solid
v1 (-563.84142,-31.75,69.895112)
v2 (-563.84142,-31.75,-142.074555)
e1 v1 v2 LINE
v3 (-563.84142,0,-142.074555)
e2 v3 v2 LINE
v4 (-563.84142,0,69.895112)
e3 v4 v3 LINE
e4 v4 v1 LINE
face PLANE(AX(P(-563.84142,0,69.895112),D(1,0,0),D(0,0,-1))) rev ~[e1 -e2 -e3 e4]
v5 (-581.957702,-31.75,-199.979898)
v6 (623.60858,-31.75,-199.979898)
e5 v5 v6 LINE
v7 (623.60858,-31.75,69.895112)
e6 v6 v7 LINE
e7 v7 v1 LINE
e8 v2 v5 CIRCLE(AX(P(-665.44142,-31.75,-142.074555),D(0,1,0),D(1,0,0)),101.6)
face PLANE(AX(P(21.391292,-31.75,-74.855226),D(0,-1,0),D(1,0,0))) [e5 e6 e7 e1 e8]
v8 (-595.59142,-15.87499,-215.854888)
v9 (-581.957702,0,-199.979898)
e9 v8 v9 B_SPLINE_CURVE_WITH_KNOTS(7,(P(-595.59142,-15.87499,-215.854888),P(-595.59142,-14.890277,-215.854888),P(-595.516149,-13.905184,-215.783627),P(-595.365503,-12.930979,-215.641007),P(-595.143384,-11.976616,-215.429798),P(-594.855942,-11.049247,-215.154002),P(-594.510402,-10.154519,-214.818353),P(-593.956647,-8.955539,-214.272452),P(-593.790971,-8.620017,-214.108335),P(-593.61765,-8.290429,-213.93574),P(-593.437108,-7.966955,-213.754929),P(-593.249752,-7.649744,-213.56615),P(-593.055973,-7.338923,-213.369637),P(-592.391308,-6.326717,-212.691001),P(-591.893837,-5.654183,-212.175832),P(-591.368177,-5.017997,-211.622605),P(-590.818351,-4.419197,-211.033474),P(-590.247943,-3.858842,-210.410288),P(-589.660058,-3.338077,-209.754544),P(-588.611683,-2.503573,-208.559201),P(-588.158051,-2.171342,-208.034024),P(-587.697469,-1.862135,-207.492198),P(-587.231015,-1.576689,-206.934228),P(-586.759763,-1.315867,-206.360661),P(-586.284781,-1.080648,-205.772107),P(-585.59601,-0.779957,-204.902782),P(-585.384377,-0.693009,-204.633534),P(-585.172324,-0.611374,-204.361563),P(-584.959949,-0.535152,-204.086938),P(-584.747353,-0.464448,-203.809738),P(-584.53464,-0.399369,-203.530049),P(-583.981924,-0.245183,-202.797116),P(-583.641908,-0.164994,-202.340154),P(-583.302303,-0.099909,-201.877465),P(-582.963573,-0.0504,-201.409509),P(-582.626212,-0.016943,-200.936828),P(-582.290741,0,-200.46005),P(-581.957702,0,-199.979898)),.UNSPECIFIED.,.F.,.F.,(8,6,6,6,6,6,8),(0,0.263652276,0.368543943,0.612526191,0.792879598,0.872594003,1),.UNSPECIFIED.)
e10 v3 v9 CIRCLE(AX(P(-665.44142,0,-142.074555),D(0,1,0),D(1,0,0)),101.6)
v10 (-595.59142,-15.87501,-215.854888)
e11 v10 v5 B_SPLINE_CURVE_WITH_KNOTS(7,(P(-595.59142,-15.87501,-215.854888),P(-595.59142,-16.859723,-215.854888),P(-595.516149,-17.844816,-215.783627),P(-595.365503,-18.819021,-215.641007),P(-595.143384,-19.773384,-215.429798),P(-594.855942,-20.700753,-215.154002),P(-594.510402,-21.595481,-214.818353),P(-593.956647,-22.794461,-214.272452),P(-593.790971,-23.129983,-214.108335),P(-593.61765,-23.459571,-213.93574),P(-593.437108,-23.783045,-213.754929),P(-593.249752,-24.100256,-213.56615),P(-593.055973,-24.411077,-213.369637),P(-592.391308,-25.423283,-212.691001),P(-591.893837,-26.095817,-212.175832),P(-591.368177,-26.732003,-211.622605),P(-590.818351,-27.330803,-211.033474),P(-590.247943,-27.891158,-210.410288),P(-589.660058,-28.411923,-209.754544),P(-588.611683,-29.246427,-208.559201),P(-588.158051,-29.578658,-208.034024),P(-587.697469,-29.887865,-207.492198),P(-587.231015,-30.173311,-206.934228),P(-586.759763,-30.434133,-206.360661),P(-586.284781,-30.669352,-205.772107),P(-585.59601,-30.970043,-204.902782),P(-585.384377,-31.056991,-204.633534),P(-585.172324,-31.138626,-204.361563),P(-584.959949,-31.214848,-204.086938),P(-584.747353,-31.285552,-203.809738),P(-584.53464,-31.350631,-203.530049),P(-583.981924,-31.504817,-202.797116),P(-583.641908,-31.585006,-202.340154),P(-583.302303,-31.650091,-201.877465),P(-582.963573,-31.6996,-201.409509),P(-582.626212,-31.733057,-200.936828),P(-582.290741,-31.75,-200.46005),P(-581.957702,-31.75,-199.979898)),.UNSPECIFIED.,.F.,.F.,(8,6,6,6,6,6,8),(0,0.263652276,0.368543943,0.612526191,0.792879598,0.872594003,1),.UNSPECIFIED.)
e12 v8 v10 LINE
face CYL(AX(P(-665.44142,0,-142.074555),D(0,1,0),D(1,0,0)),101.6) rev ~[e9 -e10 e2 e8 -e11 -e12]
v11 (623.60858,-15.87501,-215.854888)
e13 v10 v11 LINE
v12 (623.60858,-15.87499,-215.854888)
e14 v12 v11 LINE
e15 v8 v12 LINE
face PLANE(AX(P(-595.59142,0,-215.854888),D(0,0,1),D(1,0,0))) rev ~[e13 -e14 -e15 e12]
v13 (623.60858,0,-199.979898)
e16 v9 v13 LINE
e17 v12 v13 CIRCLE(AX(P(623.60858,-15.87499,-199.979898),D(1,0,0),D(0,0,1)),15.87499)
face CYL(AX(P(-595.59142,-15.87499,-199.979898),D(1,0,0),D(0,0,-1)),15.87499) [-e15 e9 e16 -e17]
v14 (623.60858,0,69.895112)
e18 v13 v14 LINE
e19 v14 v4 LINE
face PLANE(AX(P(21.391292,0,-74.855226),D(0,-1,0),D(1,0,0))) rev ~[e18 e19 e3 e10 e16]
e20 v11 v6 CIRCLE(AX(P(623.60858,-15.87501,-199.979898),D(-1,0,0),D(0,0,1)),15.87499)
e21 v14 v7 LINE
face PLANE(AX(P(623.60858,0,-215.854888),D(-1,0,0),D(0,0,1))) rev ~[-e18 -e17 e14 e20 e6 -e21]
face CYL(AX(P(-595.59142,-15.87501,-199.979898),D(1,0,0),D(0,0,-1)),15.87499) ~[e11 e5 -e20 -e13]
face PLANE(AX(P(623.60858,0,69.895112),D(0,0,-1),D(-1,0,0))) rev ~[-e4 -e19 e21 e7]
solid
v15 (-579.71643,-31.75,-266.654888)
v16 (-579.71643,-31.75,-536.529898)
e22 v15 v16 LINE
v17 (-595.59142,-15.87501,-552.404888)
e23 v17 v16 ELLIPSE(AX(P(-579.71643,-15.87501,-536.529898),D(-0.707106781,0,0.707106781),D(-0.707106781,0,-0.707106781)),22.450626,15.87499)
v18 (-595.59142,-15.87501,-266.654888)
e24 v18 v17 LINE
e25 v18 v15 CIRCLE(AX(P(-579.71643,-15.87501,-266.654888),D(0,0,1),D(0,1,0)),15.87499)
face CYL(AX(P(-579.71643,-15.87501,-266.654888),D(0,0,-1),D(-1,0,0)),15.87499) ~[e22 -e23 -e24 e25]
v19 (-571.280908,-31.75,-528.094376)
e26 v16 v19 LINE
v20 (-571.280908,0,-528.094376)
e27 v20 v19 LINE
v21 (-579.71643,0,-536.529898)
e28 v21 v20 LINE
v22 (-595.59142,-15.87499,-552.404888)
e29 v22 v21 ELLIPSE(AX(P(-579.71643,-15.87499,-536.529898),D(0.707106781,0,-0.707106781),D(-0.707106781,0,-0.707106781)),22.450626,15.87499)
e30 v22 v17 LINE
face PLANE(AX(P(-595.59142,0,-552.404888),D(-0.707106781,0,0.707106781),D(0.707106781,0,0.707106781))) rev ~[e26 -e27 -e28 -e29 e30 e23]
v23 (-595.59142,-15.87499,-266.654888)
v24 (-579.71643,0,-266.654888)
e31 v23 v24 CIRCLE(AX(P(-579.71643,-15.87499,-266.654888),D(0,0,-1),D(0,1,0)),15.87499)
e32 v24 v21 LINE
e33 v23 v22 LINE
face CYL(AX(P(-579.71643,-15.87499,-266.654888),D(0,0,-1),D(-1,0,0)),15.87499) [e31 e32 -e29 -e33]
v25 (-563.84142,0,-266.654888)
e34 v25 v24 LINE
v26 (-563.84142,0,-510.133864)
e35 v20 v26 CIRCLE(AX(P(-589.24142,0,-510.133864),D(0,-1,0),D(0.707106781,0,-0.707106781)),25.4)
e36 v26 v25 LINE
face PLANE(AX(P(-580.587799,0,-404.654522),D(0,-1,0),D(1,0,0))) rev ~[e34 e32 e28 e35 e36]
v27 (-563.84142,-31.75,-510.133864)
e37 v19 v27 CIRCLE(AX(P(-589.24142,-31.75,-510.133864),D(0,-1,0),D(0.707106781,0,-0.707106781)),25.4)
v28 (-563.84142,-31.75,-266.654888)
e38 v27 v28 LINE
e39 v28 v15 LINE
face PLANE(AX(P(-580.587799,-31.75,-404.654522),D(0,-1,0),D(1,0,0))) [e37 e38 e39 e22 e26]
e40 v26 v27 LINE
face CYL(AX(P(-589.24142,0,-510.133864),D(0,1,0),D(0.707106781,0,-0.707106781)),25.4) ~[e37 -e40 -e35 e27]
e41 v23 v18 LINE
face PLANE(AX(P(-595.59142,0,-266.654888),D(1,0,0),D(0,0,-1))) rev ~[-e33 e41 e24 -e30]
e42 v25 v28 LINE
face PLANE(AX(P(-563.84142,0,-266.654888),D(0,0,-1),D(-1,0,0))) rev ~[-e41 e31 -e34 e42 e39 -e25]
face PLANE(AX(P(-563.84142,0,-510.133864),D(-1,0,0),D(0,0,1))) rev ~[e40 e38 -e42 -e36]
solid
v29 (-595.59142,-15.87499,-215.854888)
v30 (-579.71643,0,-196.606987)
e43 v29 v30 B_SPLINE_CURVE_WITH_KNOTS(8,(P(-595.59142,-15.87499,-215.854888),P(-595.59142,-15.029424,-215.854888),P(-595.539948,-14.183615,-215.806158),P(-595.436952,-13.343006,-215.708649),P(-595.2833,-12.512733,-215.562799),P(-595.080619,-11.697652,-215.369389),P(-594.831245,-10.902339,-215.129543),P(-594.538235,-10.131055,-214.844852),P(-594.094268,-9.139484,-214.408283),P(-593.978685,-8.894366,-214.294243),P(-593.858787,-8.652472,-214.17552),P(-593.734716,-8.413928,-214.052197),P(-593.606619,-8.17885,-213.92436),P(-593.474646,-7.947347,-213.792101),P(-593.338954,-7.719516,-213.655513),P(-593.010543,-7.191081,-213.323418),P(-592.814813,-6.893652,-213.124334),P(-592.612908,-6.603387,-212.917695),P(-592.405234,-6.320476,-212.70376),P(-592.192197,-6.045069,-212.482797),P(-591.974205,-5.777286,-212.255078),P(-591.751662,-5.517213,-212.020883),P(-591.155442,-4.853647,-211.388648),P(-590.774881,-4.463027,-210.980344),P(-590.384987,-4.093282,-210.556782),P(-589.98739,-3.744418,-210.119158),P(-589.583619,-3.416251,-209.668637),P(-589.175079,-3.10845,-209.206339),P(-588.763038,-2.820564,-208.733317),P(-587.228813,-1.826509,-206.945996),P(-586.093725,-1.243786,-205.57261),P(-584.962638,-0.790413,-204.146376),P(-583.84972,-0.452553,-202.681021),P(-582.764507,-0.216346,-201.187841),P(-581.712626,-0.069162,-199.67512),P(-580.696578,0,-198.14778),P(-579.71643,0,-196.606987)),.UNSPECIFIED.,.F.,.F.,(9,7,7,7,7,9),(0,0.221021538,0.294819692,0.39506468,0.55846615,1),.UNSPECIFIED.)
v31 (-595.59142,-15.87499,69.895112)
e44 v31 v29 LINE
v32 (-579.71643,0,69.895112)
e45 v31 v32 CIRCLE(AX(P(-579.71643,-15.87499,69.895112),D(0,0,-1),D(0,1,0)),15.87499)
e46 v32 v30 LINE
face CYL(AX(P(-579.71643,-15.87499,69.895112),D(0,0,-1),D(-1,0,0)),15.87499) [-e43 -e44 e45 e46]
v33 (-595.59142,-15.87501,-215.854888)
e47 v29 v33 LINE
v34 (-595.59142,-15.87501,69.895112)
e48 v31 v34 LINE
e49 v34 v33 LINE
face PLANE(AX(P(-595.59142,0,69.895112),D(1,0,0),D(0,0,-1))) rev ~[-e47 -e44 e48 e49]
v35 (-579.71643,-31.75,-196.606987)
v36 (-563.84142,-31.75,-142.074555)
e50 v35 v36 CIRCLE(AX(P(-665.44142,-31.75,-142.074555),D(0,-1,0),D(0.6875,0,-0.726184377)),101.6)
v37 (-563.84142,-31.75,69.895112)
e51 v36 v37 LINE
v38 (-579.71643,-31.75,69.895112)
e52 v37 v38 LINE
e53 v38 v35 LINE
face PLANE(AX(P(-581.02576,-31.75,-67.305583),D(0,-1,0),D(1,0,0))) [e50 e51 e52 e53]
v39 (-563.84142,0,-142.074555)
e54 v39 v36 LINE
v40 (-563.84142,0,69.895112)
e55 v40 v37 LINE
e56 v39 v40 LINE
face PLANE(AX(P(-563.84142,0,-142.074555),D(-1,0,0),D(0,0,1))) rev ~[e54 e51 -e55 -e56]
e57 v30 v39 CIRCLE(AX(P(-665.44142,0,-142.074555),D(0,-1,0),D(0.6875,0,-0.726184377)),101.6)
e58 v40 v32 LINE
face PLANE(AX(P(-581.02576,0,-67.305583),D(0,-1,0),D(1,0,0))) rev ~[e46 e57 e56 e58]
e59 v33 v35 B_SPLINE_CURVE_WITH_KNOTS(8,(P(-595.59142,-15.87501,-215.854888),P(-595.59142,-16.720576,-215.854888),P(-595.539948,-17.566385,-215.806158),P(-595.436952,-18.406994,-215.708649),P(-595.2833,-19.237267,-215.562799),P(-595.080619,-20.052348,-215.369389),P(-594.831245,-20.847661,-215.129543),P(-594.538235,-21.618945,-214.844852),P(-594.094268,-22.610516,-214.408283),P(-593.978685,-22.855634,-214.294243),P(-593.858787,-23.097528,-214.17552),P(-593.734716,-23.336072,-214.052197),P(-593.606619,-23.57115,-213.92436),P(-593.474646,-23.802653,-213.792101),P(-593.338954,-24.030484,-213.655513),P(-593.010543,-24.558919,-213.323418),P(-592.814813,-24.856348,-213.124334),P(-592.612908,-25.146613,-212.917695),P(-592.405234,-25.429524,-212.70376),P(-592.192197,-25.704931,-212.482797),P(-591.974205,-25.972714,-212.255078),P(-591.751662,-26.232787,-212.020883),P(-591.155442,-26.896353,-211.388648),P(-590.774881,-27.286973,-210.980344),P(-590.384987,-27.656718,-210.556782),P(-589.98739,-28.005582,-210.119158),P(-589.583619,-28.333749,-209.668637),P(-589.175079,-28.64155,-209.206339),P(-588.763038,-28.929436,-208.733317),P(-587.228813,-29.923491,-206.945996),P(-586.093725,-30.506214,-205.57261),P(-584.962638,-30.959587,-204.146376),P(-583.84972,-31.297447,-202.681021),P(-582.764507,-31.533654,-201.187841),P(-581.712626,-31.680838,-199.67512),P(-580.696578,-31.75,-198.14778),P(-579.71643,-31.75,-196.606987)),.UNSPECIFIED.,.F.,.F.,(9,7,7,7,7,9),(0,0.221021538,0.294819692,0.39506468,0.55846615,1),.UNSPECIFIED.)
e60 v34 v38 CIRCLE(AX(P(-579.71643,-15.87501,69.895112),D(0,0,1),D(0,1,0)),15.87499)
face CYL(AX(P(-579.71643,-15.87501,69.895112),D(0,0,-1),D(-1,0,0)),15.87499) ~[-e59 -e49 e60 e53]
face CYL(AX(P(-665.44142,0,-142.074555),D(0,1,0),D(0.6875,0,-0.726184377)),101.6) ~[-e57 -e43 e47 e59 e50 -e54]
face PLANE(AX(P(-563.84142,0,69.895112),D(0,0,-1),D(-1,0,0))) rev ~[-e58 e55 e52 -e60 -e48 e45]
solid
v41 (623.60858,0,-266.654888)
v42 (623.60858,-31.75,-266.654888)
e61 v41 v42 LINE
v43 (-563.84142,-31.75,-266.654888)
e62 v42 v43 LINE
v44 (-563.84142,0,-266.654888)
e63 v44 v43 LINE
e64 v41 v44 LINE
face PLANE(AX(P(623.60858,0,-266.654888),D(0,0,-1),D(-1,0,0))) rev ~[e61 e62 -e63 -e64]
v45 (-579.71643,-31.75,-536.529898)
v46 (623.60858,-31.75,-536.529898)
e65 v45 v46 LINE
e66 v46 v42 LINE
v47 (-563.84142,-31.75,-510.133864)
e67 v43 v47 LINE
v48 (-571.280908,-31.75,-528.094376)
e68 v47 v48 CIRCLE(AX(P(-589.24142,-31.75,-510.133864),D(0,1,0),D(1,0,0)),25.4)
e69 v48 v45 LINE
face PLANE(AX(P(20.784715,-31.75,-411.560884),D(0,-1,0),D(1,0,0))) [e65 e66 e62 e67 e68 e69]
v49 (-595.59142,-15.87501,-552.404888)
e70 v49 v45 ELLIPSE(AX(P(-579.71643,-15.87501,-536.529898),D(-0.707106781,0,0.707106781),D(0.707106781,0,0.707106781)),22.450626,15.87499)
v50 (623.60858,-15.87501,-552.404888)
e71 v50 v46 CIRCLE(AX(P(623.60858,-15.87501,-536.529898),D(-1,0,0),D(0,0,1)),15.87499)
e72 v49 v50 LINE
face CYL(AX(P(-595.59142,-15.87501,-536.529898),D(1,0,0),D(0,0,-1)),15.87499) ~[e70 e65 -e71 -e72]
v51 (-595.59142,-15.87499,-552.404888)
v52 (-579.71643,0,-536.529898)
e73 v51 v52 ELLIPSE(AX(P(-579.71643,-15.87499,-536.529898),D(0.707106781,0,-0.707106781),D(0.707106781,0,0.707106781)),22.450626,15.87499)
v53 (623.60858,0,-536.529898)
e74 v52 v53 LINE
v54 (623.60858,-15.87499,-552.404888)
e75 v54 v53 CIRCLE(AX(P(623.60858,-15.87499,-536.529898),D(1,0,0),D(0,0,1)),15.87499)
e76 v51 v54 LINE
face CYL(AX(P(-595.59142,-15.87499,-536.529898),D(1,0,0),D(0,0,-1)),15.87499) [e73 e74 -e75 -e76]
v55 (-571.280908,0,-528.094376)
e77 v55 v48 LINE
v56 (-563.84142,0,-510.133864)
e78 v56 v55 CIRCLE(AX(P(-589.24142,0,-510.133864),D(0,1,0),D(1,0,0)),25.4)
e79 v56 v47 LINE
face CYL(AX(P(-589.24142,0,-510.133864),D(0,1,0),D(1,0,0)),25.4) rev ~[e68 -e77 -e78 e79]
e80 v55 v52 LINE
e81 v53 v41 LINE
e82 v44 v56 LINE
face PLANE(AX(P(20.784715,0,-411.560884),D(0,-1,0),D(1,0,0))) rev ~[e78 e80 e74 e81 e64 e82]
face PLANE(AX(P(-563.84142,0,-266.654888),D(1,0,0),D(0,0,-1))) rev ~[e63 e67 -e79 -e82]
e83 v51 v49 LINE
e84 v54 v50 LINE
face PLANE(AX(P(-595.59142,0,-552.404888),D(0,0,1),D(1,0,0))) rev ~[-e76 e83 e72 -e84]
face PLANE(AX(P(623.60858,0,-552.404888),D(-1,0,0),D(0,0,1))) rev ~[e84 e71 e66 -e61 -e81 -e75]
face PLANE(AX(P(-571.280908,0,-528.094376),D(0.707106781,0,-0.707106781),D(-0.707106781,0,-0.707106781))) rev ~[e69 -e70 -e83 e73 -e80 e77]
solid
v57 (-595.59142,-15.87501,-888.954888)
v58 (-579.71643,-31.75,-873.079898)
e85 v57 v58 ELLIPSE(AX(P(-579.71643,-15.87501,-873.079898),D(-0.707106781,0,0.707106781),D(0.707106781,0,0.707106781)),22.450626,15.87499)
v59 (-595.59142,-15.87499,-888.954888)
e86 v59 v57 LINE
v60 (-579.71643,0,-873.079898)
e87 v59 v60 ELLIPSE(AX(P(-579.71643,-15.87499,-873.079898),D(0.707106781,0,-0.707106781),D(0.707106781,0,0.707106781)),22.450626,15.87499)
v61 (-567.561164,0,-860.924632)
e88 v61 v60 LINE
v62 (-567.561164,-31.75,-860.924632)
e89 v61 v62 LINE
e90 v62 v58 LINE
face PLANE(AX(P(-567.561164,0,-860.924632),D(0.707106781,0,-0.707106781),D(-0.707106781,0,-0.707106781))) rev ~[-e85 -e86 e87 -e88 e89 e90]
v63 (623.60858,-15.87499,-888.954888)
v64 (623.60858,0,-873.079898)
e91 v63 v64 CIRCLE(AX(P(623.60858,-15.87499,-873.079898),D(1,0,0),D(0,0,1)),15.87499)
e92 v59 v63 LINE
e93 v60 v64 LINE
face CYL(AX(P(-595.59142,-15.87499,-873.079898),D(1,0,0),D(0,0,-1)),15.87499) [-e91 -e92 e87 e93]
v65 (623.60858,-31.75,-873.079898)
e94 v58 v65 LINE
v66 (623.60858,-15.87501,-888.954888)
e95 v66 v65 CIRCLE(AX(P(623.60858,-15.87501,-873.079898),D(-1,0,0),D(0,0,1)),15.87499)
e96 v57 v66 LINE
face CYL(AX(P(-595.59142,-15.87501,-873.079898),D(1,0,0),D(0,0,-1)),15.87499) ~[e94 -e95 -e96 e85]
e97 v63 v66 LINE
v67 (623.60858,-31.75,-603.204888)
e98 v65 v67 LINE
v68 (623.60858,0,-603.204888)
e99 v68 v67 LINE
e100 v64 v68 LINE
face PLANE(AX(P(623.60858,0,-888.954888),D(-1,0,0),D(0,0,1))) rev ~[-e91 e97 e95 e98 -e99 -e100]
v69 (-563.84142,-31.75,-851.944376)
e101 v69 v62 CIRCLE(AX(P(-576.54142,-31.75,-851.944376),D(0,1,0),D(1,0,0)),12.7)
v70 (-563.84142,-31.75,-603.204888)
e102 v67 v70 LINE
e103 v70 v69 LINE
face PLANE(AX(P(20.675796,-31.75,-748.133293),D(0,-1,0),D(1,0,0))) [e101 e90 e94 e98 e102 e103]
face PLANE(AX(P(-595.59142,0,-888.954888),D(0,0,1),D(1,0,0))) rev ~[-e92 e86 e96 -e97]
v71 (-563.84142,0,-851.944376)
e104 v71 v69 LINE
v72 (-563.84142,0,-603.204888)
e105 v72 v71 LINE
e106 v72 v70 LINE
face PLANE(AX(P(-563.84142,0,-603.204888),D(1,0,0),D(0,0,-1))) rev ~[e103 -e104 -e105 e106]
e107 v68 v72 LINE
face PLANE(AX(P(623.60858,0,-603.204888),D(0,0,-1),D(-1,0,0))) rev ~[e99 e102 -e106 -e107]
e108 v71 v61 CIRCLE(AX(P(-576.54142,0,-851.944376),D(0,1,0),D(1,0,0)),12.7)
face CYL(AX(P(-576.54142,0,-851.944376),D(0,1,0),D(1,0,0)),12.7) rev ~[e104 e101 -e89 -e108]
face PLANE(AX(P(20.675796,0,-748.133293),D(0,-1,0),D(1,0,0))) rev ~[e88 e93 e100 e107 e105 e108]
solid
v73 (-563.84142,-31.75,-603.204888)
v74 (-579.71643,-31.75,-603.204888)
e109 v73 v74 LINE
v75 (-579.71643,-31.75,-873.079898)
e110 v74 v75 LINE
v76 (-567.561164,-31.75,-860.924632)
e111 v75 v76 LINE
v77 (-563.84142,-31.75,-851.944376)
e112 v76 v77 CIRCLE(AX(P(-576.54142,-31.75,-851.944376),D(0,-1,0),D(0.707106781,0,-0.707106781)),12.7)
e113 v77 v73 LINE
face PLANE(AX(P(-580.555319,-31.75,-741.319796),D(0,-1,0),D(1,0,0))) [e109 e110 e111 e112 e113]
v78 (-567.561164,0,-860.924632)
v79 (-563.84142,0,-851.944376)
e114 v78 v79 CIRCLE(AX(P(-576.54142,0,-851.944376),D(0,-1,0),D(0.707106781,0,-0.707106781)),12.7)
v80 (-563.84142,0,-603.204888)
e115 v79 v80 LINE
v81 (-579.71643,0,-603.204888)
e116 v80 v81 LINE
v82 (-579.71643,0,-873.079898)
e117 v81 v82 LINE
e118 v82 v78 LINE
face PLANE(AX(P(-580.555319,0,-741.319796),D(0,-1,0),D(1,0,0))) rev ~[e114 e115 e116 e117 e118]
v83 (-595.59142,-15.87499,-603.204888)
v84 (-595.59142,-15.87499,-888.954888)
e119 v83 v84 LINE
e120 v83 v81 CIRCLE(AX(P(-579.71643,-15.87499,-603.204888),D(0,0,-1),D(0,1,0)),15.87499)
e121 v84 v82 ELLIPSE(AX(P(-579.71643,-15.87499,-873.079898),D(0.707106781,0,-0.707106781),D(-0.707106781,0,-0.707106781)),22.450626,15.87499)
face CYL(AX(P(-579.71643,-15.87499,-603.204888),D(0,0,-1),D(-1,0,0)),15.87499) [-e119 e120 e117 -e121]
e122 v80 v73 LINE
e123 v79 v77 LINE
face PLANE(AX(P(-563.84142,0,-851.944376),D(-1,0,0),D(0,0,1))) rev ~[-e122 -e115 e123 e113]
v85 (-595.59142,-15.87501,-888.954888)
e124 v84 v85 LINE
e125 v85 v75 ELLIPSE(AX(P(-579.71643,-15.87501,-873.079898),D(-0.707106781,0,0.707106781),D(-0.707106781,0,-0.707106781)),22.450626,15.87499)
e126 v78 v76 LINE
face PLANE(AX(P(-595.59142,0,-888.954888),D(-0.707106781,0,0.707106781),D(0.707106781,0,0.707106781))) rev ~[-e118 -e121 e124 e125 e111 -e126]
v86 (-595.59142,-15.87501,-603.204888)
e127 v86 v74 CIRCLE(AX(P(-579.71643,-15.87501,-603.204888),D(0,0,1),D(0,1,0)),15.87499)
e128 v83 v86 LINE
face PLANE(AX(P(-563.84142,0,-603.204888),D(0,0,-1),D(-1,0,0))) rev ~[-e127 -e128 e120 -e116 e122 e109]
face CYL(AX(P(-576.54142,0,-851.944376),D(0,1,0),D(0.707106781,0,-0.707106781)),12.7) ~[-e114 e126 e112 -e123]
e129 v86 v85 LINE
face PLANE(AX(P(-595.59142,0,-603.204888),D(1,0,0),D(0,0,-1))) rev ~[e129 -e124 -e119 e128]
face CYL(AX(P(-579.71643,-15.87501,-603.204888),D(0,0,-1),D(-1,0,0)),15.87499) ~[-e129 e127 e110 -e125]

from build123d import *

# Parameters (mm, degrees)
F1_DEPTH = 31.75
F2_DEPTH = 31.75
F3_R     = 15.87499
F3_2_R   = 15.87499
F3_3_R   = 15.87499
F3_4_R   = 15.87499
F3_5_R   = 15.87499
F3_6_R   = 15.87499


# Not quite as in the source:
# - a fillet or chamfer is up to 0.001 mm smaller than in the source, because OpenCascade refuses the exact size


with BuildPart() as f1:
    # F0 (on Front) → F1 (new body)
    with BuildSketch(Plane.XZ):
        with BuildLine():
            Line((623.6085797757, 69.8951120117), (-563.8414202243, 69.8951120117))
            Line((-563.8414202243, 69.8951120117), (-563.8414202243, -142.074555243))
            ThreePointArc((-563.8414202243, -142.074555243), (-572.1158610243, -182.2354815272), (-595.5914202243, -215.8548879883))
            Line((-595.5914202243, -215.8548879883), (623.6085797757, -215.8548879883))
            Line((623.6085797757, -215.8548879883), (623.6085797757, 69.8951120117))
        make_face()
    extrude(amount=F1_DEPTH)

    # F3#6 (radius 15.875 in the source; OpenCascade refuses exactly that, so slightly less here)
    f3_6_edges = [f1.edges().sort_by_distance(p)[0] for p in [
        (14.00858, -31.75, -215.854888),
        (14.00858, 0, -215.854888),
    ]]
    fillet(f3_6_edges, radius=F3_6_R)


with BuildPart() as f1b:
    # F0 (on Front) → F1, piece 2 (new body)
    with BuildSketch(Plane.XZ):
        with BuildLine():
            Line((623.6085797757, -266.6548879883), (-563.8414202243, -266.6548879883))
            Line((-563.8414202243, -266.6548879883), (-563.8414202243, -510.133863504))
            ThreePointArc((-563.8414202243, -510.133863504), (-565.7748800985, -519.8540226861), (-571.2809079822, -528.0943757462))
            Line((-571.2809079822, -528.0943757462), (-595.5914202243, -552.4048879883))
            Line((-595.5914202243, -552.4048879883), (623.6085797757, -552.4048879883))
            Line((623.6085797757, -552.4048879883), (623.6085797757, -266.6548879883))
        make_face()
    extrude(amount=F1_DEPTH)

    # F3#3 (radius 15.875 in the source; OpenCascade refuses exactly that, so slightly less here)
    f3_3_edges = [f1b.edges().sort_by_distance(p)[0] for p in [
        (14.00858, -31.75, -552.404888),
        (14.00858, 0, -552.404888),
    ]]
    fillet(f3_3_edges, radius=F3_3_R)


with BuildPart() as f1c:
    # F0 (on Front) → F1, piece 3 (new body)
    with BuildSketch(Plane.XZ):
        with BuildLine():
            Line((623.6085797757, -603.2048879883), (-563.8414202243, -603.2048879883))
            Line((-563.8414202243, -603.2048879883), (-563.8414202243, -851.9443757462))
            ThreePointArc((-563.8414202243, -851.9443757462), (-564.8081501614, -856.8044553372), (-567.5611641032, -860.9246318672))
            Line((-567.5611641032, -860.9246318672), (-595.5914202243, -888.9548879883))
            Line((-595.5914202243, -888.9548879883), (623.6085797757, -888.9548879883))
            Line((623.6085797757, -888.9548879883), (623.6085797757, -603.2048879883))
        make_face()
    extrude(amount=F1_DEPTH)

    # F3 (radius 15.875 in the source; OpenCascade refuses exactly that, so slightly less here)
    f3_edges = [f1c.edges().sort_by_distance(p)[0] for p in [
        (14.00858, -31.75, -888.954888),
        (14.00858, 0, -888.954888),
    ]]
    fillet(f3_edges, radius=F3_R)


with BuildPart() as f2:
    # F0 (on Front) → F2 (new body)
    with BuildSketch(Plane.XZ):
        with BuildLine():
            Line((-563.8414202243, 69.8951120117), (-595.5914202243, 69.8951120117))
            Line((-595.5914202243, 69.8951120117), (-595.5914202243, -215.8548879883))
            ThreePointArc((-595.5914202243, -215.8548879883), (-572.1158610243, -182.2354815272), (-563.8414202243, -142.074555243))
            Line((-563.8414202243, -142.074555243), (-563.8414202243, 69.8951120117))
        make_face()
    extrude(amount=F2_DEPTH)

    # F3#5 (radius 15.875 in the source; OpenCascade refuses exactly that, so slightly less here)
    f3_5_edges = [f2.edges().sort_by_distance(p)[0] for p in [
        (-595.59142, -31.75, -72.979888),
        (-595.59142, 0, -72.979888),
    ]]
    fillet(f3_5_edges, radius=F3_5_R)


with BuildPart() as f2b:
    # F0 (on Front) → F2, piece 2 (new body)
    with BuildSketch(Plane.XZ):
        with BuildLine():
            Line((-563.8414202243, -266.6548879883), (-595.5914202243, -266.6548879883))
            Line((-595.5914202243, -266.6548879883), (-595.5914202243, -552.4048879883))
            Line((-595.5914202243, -552.4048879883), (-571.2809079822, -528.0943757462))
            ThreePointArc((-571.2809079822, -528.0943757462), (-565.7748800985, -519.8540226861), (-563.8414202243, -510.133863504))
            Line((-563.8414202243, -510.133863504), (-563.8414202243, -266.6548879883))
        make_face()
    extrude(amount=F2_DEPTH)

    # F3#4 (radius 15.875 in the source; OpenCascade refuses exactly that, so slightly less here)
    f3_4_edges = [f2b.edges().sort_by_distance(p)[0] for p in [
        (-595.59142, -31.75, -409.529888),
        (-595.59142, 0, -409.529888),
    ]]
    fillet(f3_4_edges, radius=F3_4_R)


with BuildPart() as f2c:
    # F0 (on Front) → F2, piece 3 (new body)
    with BuildSketch(Plane.XZ):
        with BuildLine():
            Line((-563.8414202243, -603.2048879883), (-595.5914202243, -603.2048879883))
            Line((-595.5914202243, -603.2048879883), (-595.5914202243, -888.9548879883))
            Line((-595.5914202243, -888.9548879883), (-567.5611641032, -860.9246318672))
            ThreePointArc((-567.5611641032, -860.9246318672), (-564.8081501614, -856.8044553372), (-563.8414202243, -851.9443757462))
            Line((-563.8414202243, -851.9443757462), (-563.8414202243, -603.2048879883))
        make_face()
    extrude(amount=F2_DEPTH)

    # F3#2 (radius 15.875 in the source; OpenCascade refuses exactly that, so slightly less here)
    f3_2_edges = [f2c.edges().sort_by_distance(p)[0] for p in [
        (-595.59142, -31.75, -746.079888),
        (-595.59142, 0, -746.079888),
    ]]
    fillet(f3_2_edges, radius=F3_2_R)


solid = Compound([f1.part, f1b.part, f1c.part, f2.part, f2b.part, f2c.part])
